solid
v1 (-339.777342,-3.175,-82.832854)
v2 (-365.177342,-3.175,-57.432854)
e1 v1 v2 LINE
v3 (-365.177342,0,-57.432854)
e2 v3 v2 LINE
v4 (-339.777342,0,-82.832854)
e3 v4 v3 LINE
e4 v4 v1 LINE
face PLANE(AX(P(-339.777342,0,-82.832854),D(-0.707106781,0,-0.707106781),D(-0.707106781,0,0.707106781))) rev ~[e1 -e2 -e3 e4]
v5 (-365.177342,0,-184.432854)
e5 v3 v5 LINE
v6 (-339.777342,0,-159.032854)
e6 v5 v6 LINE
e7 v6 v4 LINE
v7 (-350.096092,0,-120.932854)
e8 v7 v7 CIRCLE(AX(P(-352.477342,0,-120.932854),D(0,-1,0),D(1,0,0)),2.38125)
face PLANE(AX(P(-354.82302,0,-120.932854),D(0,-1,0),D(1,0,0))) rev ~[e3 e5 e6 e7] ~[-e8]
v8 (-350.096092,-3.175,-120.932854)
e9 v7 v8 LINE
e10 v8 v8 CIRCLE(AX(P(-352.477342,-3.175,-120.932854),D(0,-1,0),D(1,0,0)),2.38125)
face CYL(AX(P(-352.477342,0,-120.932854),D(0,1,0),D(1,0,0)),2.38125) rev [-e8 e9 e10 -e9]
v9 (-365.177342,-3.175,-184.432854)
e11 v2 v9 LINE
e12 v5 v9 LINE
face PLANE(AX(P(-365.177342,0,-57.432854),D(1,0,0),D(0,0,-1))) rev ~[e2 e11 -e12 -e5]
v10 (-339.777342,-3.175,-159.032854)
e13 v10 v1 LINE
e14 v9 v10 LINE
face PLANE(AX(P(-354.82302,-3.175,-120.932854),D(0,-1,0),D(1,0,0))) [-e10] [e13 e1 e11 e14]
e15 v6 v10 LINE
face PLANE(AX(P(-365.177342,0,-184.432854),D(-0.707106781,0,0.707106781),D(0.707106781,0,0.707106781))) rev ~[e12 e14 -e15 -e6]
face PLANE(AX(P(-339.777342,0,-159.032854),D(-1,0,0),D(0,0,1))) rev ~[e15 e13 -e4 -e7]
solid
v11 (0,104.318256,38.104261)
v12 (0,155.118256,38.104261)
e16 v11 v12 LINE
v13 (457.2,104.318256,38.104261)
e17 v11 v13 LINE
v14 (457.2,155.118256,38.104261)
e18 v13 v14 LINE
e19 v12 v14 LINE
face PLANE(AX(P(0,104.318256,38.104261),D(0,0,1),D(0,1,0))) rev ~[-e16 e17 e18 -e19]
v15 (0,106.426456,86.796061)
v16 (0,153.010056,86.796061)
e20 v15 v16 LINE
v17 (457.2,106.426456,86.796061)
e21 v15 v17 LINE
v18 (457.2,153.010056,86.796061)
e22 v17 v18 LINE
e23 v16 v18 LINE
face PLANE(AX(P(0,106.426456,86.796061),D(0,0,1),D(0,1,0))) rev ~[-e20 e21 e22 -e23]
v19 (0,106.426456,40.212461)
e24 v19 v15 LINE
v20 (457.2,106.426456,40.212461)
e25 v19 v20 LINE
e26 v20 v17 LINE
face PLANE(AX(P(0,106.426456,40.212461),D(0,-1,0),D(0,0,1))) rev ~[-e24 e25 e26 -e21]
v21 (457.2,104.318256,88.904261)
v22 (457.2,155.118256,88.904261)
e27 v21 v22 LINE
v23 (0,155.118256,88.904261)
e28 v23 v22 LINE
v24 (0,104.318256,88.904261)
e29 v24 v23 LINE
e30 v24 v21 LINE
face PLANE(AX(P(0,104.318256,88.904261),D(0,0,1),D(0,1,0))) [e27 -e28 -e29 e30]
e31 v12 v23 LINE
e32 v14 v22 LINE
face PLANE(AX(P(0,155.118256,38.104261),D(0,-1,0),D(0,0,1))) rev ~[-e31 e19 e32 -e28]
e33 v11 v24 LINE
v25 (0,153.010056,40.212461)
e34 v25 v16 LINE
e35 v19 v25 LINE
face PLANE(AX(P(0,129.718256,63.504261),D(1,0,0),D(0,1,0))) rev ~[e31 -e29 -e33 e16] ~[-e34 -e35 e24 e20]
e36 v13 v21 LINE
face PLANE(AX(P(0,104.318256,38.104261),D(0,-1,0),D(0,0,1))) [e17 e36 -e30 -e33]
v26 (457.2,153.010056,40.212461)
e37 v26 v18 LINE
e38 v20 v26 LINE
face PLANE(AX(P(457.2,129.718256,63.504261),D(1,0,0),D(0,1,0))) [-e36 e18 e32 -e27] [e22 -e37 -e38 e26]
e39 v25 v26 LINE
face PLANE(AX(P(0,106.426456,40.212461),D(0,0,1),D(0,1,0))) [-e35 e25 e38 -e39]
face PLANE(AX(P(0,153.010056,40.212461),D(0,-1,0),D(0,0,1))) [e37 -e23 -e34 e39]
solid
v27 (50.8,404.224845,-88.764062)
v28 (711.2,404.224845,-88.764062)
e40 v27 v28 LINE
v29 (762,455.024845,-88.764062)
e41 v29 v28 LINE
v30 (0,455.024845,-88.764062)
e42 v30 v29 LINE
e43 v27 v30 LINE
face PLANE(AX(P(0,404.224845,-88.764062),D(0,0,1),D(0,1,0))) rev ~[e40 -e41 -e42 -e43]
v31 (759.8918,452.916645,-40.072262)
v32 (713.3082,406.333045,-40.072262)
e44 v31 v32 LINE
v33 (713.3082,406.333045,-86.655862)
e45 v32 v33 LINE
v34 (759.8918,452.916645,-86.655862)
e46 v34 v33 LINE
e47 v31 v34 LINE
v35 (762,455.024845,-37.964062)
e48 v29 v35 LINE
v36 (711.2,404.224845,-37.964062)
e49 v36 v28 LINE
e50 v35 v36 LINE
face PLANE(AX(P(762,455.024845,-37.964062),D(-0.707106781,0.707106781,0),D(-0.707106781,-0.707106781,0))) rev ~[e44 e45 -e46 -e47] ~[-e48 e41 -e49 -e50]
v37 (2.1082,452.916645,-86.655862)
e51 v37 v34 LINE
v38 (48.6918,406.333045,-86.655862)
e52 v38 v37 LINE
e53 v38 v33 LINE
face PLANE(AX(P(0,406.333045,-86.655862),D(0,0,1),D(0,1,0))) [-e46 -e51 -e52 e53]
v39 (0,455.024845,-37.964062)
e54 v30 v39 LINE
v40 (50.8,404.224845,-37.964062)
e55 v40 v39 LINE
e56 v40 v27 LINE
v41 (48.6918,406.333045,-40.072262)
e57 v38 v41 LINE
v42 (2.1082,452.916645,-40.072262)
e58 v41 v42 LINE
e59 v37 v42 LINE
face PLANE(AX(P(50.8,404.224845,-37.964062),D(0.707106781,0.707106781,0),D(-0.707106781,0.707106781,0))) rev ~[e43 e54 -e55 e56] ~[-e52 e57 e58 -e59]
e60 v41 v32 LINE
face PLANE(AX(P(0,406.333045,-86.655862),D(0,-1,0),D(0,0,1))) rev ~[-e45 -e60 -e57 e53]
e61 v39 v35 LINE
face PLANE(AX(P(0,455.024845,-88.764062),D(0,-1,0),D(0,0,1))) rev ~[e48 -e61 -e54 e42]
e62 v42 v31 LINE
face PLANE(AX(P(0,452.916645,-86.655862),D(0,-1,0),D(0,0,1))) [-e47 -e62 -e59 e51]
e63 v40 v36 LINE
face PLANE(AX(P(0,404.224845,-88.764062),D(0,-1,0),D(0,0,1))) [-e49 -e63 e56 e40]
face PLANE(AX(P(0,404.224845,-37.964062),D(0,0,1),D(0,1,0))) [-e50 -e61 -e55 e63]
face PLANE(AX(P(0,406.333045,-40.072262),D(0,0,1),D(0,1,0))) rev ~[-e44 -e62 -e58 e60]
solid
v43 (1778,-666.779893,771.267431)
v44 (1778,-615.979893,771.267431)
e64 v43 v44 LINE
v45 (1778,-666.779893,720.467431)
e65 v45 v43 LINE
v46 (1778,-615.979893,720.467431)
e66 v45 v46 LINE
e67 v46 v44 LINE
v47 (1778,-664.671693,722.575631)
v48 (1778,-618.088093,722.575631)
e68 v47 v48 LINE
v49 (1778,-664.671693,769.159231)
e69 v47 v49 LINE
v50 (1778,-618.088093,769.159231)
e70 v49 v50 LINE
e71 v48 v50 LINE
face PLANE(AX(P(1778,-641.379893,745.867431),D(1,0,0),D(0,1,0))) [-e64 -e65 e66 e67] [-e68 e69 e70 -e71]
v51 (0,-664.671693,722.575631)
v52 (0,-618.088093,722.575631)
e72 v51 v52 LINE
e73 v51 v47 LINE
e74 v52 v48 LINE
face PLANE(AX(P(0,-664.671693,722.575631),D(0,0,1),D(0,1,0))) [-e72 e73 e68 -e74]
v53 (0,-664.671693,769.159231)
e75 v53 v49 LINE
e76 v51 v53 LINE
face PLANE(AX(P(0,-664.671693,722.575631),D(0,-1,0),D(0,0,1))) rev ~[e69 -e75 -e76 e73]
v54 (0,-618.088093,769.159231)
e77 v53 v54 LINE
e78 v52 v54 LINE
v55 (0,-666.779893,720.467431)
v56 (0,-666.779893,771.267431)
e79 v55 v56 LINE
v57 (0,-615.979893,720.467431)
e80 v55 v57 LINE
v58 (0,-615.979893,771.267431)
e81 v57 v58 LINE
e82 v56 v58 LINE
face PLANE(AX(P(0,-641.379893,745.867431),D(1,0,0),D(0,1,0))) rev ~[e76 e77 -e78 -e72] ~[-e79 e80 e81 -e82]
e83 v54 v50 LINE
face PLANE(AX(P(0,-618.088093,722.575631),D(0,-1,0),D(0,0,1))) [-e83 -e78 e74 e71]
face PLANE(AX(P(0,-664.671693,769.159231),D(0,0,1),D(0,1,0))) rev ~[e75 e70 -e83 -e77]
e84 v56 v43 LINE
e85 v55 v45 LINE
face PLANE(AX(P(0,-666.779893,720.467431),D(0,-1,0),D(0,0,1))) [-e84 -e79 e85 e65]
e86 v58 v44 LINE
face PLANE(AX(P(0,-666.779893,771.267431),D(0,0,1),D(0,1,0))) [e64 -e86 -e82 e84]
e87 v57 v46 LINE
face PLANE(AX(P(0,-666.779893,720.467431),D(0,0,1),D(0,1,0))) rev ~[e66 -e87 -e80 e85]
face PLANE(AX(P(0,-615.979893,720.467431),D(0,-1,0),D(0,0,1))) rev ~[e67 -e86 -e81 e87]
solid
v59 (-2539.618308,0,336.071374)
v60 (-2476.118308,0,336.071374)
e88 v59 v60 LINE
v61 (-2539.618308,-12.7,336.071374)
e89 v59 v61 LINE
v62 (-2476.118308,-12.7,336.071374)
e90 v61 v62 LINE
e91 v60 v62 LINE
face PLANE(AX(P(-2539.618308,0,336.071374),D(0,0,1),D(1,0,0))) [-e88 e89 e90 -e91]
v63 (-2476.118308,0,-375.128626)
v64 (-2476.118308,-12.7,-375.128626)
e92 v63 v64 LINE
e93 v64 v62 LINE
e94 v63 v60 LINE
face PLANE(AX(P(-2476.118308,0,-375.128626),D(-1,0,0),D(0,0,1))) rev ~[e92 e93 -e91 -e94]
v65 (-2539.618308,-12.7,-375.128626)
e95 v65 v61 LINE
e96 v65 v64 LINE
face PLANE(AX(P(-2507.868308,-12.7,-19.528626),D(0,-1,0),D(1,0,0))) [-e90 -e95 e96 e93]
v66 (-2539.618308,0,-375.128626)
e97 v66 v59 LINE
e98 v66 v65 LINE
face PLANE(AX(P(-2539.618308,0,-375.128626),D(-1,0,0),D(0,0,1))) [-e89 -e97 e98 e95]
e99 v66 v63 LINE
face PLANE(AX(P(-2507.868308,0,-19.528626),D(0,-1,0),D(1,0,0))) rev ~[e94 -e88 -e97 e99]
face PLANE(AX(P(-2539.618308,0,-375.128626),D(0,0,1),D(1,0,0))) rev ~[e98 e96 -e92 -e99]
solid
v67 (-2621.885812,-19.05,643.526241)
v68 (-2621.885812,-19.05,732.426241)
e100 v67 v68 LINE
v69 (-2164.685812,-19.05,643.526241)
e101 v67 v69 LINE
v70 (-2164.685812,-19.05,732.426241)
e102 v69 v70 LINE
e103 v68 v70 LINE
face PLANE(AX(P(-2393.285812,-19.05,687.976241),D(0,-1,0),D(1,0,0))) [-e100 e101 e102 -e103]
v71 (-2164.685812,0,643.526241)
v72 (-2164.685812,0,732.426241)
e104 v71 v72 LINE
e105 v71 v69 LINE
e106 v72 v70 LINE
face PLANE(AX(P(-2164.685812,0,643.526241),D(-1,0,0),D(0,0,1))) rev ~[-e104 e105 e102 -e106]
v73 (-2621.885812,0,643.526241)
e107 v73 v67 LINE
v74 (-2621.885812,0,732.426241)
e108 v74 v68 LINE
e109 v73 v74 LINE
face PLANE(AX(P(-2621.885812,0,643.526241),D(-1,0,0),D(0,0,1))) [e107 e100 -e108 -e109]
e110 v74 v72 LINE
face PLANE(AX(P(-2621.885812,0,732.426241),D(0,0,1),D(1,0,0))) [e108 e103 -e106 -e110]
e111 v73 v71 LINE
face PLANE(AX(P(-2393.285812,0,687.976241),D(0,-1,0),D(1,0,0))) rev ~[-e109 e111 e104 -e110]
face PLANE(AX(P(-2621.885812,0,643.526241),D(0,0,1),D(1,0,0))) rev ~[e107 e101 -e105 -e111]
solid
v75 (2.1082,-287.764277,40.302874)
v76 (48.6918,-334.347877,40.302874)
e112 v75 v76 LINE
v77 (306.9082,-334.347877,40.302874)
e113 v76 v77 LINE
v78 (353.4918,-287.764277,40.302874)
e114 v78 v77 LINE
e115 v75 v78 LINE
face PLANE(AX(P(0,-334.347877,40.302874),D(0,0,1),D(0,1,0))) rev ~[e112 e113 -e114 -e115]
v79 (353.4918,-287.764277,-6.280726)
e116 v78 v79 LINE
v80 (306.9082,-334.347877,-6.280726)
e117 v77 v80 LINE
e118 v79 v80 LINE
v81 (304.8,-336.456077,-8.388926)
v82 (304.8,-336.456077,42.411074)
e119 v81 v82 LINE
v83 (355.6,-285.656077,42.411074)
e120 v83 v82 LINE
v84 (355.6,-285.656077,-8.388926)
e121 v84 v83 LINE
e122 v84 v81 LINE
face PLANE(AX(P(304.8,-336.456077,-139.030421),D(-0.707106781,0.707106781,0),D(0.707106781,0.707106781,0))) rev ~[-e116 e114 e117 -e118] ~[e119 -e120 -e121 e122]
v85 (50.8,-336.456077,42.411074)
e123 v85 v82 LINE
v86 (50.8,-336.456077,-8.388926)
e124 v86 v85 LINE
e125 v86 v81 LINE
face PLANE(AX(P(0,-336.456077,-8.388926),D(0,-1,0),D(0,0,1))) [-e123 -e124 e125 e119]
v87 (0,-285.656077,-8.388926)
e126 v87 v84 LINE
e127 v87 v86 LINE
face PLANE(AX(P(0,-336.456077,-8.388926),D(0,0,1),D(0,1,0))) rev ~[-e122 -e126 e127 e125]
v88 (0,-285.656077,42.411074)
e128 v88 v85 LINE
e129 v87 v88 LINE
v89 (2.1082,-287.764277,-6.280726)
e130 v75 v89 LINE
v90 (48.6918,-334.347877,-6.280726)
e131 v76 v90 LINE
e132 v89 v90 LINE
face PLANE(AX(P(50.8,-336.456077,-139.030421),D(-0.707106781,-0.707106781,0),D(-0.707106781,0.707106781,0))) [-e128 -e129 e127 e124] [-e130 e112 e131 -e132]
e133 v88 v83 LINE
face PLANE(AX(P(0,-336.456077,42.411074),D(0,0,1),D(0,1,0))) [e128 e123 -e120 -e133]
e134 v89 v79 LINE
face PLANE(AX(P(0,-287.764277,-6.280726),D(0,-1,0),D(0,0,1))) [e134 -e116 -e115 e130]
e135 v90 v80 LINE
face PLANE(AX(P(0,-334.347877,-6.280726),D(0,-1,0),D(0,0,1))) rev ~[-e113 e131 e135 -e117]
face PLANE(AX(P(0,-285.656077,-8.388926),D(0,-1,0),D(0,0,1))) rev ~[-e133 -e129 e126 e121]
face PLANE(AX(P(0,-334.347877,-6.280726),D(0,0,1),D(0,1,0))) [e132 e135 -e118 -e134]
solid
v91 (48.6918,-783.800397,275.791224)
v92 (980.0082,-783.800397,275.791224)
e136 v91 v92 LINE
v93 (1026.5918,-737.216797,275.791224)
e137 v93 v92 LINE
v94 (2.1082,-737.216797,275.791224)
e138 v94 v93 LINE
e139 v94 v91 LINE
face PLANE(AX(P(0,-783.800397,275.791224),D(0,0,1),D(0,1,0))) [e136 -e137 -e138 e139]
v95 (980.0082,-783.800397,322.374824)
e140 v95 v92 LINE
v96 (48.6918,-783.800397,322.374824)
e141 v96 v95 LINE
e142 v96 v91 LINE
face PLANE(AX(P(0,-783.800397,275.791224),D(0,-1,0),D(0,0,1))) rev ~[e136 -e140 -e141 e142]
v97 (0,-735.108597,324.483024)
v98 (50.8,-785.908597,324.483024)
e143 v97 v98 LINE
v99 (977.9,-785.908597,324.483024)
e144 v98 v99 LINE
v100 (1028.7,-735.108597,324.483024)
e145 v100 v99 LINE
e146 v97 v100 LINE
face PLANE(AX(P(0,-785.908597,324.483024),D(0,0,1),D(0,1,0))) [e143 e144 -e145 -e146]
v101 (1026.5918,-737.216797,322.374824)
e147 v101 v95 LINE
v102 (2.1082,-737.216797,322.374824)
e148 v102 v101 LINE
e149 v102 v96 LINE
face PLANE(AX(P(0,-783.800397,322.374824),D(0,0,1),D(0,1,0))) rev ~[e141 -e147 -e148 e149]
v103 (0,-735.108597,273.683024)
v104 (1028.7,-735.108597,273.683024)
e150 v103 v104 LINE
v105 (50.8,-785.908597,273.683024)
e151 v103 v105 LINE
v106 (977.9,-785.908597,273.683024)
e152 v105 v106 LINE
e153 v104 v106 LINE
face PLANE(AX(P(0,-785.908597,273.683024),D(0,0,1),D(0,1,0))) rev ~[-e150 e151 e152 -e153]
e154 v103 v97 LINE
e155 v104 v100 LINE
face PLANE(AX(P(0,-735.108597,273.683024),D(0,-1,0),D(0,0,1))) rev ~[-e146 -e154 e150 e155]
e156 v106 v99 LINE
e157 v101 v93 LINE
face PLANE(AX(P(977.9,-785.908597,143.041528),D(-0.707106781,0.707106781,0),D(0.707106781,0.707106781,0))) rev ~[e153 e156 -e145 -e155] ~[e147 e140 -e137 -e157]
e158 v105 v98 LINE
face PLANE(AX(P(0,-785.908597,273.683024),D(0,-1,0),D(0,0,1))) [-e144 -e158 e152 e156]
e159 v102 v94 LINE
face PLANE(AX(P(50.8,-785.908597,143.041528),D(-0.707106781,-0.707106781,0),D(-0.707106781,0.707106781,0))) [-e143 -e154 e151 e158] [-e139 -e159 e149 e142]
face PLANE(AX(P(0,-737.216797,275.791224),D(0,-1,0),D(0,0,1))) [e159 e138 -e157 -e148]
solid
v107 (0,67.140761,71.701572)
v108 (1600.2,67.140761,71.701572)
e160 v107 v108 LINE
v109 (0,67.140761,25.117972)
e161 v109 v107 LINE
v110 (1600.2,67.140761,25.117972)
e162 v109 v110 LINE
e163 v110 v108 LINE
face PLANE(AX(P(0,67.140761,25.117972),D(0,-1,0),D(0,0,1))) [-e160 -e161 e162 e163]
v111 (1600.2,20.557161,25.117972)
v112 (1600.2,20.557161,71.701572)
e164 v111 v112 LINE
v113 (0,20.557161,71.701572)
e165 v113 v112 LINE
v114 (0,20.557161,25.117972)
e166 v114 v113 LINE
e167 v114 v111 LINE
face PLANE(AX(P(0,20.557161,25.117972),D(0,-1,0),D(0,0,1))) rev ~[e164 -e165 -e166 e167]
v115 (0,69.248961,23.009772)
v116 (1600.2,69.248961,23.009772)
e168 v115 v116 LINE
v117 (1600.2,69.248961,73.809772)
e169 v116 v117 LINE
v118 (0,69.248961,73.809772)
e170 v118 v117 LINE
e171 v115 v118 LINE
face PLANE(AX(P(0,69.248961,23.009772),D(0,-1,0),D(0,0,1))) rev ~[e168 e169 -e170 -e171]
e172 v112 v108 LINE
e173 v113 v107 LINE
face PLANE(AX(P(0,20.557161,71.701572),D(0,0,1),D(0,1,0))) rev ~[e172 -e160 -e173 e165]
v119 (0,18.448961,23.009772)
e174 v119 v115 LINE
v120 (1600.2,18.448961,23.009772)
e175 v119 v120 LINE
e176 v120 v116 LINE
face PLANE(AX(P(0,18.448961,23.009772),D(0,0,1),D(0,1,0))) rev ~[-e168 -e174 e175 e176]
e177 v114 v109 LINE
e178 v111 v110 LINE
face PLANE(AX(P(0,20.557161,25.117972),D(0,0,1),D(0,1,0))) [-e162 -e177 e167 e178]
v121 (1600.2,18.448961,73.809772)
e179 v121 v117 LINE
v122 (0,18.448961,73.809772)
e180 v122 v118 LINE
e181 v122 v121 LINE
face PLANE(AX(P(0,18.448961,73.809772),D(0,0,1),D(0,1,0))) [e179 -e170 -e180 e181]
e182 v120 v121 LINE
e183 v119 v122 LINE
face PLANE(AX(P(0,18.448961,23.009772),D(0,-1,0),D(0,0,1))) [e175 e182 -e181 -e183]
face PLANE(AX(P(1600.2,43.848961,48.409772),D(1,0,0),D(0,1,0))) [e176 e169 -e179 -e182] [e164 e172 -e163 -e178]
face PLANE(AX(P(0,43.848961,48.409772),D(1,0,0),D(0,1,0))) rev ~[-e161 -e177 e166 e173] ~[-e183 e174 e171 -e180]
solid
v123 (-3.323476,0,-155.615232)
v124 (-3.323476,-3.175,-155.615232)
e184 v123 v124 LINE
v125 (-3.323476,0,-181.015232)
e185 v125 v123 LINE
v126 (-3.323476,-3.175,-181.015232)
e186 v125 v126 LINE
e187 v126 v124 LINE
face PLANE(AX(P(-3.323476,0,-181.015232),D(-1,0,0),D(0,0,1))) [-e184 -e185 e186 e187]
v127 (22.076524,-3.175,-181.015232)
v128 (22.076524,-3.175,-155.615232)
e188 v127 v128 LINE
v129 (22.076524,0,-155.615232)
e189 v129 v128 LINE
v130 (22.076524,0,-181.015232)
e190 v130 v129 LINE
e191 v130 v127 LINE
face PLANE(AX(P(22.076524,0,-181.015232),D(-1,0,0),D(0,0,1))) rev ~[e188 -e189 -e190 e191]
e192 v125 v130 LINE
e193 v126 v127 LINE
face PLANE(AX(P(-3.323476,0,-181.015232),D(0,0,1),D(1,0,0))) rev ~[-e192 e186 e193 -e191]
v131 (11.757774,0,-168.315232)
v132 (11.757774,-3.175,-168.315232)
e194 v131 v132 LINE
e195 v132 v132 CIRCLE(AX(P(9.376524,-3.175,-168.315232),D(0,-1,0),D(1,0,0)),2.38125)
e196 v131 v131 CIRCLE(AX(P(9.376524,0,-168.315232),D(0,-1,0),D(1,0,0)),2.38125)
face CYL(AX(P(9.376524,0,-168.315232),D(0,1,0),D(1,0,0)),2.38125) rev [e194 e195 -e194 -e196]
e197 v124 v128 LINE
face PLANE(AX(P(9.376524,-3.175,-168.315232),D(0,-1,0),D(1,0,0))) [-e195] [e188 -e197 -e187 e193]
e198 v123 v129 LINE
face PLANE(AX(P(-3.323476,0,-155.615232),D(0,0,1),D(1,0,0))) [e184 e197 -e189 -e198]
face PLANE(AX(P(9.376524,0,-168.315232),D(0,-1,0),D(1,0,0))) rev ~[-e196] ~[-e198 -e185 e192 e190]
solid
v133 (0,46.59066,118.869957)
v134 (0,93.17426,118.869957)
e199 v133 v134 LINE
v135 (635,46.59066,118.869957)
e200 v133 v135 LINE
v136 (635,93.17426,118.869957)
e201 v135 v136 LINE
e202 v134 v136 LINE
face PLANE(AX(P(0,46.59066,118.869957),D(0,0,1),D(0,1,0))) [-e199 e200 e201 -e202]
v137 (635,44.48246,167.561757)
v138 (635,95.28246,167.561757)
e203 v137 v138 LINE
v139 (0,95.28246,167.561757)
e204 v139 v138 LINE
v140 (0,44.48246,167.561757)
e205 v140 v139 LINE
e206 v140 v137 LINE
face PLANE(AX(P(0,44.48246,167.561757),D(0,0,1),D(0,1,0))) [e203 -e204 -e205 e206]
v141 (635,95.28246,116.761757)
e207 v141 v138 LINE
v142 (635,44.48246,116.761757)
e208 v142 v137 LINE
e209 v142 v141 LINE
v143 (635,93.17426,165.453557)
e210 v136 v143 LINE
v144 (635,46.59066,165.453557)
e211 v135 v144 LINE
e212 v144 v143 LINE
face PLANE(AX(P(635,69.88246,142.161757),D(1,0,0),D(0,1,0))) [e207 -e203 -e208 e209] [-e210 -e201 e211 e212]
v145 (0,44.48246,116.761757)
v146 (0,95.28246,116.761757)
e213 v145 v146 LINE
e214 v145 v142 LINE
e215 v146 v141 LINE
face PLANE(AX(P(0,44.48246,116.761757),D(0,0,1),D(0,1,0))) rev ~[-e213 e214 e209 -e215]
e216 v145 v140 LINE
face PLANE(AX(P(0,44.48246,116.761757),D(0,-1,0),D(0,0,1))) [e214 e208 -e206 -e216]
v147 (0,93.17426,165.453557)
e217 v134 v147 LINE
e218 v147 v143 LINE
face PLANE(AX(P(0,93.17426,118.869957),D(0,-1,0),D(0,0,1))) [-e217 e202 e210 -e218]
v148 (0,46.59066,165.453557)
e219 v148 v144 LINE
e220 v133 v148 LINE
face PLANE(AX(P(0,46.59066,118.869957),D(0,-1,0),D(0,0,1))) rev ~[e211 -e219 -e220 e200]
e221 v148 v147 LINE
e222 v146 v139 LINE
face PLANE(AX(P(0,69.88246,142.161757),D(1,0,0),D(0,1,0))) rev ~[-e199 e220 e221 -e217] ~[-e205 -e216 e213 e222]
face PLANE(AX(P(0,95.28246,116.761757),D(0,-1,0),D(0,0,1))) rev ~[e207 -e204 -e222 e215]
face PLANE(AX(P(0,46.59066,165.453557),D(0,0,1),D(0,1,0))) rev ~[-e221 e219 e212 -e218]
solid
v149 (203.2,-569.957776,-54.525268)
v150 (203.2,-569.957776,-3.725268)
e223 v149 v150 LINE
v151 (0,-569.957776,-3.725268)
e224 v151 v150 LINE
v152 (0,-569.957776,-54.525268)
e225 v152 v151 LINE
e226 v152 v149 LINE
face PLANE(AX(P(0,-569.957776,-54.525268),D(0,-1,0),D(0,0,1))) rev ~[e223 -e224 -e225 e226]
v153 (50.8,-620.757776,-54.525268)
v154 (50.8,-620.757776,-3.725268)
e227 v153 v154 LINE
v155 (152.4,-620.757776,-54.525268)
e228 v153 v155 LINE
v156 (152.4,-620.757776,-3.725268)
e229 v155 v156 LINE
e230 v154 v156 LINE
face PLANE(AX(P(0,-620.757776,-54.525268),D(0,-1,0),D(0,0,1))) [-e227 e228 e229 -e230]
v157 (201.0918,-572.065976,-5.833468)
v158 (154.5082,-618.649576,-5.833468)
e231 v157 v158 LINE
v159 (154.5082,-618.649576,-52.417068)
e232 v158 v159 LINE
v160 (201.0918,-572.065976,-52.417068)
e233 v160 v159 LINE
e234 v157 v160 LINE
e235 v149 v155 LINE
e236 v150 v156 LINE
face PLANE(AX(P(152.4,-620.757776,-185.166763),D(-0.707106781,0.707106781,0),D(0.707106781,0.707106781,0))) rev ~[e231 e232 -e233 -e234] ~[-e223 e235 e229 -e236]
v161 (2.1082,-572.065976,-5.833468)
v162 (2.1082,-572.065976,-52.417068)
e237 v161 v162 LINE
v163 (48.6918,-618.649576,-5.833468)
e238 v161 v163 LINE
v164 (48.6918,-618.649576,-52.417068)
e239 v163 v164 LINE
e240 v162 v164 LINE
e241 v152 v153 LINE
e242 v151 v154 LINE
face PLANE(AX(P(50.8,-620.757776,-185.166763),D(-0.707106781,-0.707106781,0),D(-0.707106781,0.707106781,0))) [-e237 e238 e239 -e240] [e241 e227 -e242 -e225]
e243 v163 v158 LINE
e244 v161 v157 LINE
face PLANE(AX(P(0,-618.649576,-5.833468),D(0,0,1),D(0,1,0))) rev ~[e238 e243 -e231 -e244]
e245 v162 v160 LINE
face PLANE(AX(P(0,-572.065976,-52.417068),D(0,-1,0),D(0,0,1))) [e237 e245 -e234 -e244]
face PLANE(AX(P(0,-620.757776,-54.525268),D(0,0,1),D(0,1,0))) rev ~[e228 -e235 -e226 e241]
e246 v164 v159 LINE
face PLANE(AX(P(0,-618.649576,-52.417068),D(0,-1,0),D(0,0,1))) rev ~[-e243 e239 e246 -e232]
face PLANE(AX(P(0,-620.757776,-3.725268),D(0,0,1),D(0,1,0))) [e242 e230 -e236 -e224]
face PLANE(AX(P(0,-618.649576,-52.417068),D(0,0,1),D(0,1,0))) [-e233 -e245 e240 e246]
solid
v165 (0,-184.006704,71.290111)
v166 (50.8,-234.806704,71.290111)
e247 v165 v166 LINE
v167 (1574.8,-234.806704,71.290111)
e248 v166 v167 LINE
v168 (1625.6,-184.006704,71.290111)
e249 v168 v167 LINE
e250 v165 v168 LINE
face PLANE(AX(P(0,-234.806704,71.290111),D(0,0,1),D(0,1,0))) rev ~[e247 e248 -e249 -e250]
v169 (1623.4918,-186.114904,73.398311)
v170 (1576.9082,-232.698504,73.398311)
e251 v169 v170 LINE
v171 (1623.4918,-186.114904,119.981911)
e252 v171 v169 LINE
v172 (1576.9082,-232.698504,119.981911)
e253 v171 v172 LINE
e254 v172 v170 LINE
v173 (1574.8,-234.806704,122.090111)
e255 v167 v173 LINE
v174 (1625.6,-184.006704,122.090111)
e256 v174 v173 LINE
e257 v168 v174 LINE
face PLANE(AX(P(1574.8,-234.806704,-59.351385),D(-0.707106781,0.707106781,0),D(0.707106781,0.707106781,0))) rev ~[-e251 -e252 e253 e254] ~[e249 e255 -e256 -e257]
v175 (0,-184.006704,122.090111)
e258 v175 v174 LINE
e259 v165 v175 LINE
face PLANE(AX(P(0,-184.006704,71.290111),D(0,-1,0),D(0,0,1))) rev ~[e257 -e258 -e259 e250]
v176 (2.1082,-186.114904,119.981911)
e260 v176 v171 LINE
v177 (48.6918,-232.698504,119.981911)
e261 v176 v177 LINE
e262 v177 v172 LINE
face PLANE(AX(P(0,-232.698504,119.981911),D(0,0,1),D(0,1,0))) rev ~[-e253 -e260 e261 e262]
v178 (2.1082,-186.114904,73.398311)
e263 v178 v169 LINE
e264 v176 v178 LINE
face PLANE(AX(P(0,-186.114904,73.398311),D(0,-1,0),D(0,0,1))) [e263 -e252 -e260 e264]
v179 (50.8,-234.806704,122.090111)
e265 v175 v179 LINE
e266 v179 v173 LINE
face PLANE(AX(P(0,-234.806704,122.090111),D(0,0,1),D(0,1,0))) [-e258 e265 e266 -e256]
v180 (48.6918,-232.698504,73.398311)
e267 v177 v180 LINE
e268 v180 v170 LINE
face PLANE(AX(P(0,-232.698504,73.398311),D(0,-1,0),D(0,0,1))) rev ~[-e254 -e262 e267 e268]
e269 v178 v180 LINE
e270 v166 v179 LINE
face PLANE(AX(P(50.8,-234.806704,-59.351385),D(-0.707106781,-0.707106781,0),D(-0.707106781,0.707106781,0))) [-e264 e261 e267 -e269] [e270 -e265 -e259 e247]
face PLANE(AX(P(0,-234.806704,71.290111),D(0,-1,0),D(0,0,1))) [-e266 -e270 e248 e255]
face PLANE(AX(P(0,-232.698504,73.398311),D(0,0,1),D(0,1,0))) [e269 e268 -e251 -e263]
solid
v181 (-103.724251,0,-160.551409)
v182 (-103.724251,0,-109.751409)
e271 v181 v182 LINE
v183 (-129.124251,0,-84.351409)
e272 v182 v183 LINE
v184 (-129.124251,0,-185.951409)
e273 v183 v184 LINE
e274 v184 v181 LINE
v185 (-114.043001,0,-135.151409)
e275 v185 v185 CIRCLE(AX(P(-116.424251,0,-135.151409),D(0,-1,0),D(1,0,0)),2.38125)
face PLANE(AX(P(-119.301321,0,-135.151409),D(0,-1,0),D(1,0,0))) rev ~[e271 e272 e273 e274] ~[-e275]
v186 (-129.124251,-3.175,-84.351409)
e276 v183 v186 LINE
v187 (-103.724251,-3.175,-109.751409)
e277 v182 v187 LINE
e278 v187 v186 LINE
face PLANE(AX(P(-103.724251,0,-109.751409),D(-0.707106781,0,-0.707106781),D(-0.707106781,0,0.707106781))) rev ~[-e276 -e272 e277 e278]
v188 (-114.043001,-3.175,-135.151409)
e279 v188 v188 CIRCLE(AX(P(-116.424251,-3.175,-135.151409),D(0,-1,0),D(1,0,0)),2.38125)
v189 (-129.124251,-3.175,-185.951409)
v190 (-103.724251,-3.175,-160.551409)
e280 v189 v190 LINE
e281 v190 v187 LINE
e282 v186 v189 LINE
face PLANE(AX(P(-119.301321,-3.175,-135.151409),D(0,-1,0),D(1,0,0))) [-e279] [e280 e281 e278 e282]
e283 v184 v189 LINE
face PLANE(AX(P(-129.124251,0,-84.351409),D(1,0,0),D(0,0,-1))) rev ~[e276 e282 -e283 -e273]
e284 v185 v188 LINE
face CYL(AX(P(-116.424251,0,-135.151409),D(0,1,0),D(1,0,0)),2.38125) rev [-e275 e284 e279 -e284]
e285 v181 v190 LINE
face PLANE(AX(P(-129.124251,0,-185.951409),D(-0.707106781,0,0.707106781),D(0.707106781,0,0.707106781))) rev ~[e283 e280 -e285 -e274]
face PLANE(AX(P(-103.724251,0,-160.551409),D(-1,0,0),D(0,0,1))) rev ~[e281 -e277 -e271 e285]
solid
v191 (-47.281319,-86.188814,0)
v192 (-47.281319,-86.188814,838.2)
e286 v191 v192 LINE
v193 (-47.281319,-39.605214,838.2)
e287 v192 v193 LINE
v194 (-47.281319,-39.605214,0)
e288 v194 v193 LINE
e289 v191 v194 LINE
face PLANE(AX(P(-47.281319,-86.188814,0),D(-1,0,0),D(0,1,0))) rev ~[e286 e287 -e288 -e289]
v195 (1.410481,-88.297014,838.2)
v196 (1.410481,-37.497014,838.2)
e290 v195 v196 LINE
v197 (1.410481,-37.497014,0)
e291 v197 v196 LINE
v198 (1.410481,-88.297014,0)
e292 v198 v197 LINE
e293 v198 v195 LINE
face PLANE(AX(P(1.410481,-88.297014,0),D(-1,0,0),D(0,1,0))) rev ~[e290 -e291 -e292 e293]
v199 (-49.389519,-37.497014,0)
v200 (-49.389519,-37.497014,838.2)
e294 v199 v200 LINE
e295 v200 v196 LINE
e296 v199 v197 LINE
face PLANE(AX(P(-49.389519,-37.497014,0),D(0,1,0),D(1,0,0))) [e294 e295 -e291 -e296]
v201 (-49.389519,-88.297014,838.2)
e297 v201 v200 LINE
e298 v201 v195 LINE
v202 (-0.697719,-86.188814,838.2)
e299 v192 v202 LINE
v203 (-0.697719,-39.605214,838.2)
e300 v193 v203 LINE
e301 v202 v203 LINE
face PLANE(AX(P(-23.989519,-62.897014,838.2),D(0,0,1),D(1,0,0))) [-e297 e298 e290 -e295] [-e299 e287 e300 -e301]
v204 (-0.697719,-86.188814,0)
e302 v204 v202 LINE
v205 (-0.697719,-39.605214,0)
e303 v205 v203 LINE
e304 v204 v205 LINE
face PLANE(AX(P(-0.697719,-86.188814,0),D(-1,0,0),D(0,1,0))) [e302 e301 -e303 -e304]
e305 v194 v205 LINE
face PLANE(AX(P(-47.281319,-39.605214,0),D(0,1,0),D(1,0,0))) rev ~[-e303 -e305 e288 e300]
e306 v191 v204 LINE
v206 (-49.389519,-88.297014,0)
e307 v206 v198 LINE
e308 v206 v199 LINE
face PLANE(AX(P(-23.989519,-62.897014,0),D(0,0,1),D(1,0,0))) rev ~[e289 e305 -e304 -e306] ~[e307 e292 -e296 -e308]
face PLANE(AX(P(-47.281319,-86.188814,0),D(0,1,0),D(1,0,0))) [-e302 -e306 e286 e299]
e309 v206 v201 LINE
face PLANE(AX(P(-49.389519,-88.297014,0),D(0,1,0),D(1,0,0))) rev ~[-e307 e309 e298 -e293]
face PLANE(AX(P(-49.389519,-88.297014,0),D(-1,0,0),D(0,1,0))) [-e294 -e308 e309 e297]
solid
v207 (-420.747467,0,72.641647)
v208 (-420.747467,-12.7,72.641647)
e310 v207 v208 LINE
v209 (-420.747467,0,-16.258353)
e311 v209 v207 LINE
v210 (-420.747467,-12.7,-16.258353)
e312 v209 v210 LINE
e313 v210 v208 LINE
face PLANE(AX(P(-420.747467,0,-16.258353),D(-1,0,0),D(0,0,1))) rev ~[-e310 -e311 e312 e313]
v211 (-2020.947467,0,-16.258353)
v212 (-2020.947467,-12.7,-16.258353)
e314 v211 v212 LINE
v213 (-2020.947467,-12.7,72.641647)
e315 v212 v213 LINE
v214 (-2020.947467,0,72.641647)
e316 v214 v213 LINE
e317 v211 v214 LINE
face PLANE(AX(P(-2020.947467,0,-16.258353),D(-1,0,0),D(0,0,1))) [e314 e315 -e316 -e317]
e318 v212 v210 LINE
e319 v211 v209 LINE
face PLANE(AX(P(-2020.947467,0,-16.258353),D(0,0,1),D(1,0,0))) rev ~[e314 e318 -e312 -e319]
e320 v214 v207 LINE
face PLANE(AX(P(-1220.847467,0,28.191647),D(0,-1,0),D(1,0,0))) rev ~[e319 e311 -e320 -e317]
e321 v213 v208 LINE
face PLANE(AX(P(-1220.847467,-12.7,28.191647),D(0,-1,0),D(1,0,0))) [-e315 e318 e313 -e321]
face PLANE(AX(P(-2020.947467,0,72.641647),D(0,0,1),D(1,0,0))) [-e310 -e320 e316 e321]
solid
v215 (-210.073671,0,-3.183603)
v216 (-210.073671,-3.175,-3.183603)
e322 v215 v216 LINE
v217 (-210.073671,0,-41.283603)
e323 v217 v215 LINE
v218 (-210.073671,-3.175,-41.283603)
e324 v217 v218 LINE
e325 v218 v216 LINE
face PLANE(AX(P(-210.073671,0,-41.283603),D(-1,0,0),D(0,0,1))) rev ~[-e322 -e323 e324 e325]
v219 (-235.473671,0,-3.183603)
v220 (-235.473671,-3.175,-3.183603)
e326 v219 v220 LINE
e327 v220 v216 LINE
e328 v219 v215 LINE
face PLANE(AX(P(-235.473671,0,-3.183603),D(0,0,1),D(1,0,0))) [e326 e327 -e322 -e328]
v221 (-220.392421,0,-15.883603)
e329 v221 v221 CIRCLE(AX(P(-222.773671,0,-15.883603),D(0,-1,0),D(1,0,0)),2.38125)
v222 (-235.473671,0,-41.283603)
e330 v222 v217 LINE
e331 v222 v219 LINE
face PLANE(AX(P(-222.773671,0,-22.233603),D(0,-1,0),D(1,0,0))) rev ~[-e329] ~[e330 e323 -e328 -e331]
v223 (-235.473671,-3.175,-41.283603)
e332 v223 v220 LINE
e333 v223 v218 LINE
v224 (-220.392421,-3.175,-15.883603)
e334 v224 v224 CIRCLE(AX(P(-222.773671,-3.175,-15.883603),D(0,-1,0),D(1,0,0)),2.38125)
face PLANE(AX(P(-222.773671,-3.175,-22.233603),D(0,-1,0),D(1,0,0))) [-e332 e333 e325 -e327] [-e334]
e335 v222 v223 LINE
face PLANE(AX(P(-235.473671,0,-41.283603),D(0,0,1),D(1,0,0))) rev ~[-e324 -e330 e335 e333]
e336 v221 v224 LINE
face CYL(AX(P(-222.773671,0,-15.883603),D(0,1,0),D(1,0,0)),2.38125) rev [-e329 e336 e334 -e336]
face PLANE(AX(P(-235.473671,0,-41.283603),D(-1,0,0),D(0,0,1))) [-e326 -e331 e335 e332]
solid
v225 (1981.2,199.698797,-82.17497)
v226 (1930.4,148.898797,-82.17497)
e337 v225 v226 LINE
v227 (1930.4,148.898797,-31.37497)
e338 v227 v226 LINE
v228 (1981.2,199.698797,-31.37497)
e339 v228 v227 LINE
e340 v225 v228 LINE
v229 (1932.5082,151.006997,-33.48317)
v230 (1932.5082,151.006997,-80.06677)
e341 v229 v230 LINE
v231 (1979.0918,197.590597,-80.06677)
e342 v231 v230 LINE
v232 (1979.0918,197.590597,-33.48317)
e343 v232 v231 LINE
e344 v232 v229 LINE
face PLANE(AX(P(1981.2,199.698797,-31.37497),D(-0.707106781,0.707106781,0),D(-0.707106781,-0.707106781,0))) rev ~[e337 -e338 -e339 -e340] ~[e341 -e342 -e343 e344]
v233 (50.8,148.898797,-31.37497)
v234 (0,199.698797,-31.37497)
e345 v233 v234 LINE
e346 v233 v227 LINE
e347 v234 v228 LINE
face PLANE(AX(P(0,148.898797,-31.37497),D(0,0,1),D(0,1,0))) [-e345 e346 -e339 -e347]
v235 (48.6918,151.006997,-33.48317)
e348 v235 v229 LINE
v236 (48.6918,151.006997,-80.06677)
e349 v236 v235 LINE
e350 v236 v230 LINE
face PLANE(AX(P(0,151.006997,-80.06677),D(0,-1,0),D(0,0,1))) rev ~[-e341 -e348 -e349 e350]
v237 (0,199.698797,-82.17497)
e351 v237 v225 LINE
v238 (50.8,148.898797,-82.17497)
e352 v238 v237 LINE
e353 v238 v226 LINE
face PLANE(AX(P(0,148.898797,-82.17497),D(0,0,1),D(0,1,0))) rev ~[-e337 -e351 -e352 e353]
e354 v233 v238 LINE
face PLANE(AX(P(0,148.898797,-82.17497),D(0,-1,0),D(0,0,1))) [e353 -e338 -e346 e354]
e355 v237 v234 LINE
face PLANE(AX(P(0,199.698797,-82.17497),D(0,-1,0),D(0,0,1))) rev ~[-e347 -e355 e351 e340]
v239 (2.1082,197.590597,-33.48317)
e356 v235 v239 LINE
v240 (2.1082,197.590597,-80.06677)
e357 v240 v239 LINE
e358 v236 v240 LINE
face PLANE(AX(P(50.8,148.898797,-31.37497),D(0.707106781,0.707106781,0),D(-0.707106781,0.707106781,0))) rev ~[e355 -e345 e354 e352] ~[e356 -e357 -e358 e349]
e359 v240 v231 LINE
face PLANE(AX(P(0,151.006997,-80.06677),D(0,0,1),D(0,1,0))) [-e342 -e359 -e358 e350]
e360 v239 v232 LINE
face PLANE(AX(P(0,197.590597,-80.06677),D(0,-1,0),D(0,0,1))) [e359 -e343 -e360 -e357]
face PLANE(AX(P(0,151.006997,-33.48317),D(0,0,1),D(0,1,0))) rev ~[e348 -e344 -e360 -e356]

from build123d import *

# Parameters (mm, degrees)
F0_W         = 50.8
F0_H         = 50.8
F0_W_2       = 46.5836
F0_H_2       = 46.5836
F1_DEPTH     = 838.2
F2_W         = 50.8
F2_H         = 50.8
F2_W_2       = 46.5836
F2_H_2       = 46.5836
F3_DEPTH     = 1600.2
F4_W         = 50.8
F4_H         = 50.8
F4_W_2       = 46.5836
F4_H_2       = 46.5836
F5_DEPTH     = 457.2
F6_W         = 50.8
F6_H         = 50.8
F6_W_2       = 46.5836
F6_H_2       = 46.5836
F7_DEPTH     = 1981.2
F9_DEPTH     = 50.8
F10_W        = 50.8
F10_H        = 50.8
F10_W_2      = 46.5836
F10_H_2      = 46.5836
F11_DEPTH    = 762
F13_DEPTH    = 50.8
F14_R        = 2.38125
F15_DEPTH    = 3.175
F16_W        = 25.4
F16_H        = 25.4
F16_R        = 2.38125
F17_DEPTH    = 3.175
F18_W        = 1600.2
F18_H        = 88.9
F19_DEPTH    = 12.7
F20_W        = 63.5
F20_H        = 711.2
F21_DEPTH    = 12.7
F22_W        = 50.8
F22_H        = 50.8
F22_W_2      = 46.5836
F22_H_2      = 46.5836
F23_DEPTH    = 355.6
F24_T1_DEPTH = 312.0829915773
F25_W        = 50.8
F25_H        = 50.8
F25_W_2      = 46.5836
F25_H_2      = 46.5836
F26_DEPTH    = 1625.6
F27_T1_DEPTH = 312.0829915773
F28_W        = 50.8
F28_H        = 50.8
F28_W_2      = 46.5836
F28_H_2      = 46.5836
F29_DEPTH    = 203.2
F30_T1_DEPTH = 312.0829915773
F31_R        = 2.38125
F32_DEPTH    = 3.175
F33_W        = 25.4
F33_H        = 38.1
F33_R        = 2.38125
F34_DEPTH    = 3.175
F35_W        = 457.2
F35_H        = 88.9
F36_DEPTH    = 19.05
F37_W        = 50.8
F37_H        = 50.8
F37_W_2      = 46.5836
F37_H_2      = 46.5836
F38_DEPTH    = 1028.7
F39_T1_DEPTH = 312.0829915773
F40_W        = 50.8
F40_H        = 50.8
F40_W_2      = 46.5836
F40_H_2      = 46.5836
F41_DEPTH    = 635
F42_W        = 50.8
F42_H        = 50.8
F42_W_2      = 46.5836
F42_H_2      = 46.5836
F43_DEPTH    = 1778


# Not quite as in the source:
# - a fillet or chamfer that OpenCascade refuses, or shapes differently, is made with other operations: its cross-section is extruded or revolved along the edge and cut away or added


with BuildPart() as f1:
    # F0 (on Top) → F1 (new body)
    with BuildSketch(Plane.XY):
        with Locations((-23.9895193481, -62.8970144058)):
            Rectangle(F0_W, F0_H)
        with Locations((-23.9895193481, -62.8970144058)):
            Rectangle(F0_W_2, F0_H_2, mode=Mode.SUBTRACT)
    extrude(amount=F1_DEPTH)


with BuildPart() as f3:
    # F2 (on Right) → F3 (new body)
    with BuildSketch(Plane.YZ):
        with Locations((43.8489612991, 48.4097724301)):
            Rectangle(F2_W, F2_H)
        with Locations((43.8489612991, 48.4097724301)):
            Rectangle(F2_W_2, F2_H_2, mode=Mode.SUBTRACT)
    extrude(amount=F3_DEPTH)


with BuildPart() as f5:
    # F4 (on Right) → F5 (new body)
    with BuildSketch(Plane.YZ):
        with Locations((129.718255794, 63.5042605758)):
            Rectangle(F4_W, F4_H)
        with Locations((129.718255794, 63.5042605758)):
            Rectangle(F4_W_2, F4_H_2, mode=Mode.SUBTRACT)
    extrude(amount=F5_DEPTH)


with BuildPart() as f7:
    # F6 (on Right) → F7 (new body)
    with BuildSketch(Plane.YZ):
        with Locations((174.2987973452, -56.7749696016)):
            Rectangle(F6_W, F6_H)
        with Locations((174.2987973452, -56.7749696016)):
            Rectangle(F6_W_2, F6_H_2, mode=Mode.SUBTRACT)
    extrude(amount=F7_DEPTH)

    # F8 (on face) → F9 (cut, through all)
    with BuildSketch(Plane.XY.offset(-31.3749696016)):
        Polygon((1981.2, 148.8987973452), (1981.2, 199.6987973452), (1930.4, 148.8987973452), align=None)
        Polygon((50.8, 148.8987973452), (0, 199.6987973452), (0, 148.8987973452), align=None)
    extrude(amount=-F9_DEPTH, mode=Mode.SUBTRACT)


with BuildPart() as f11:
    # F10 (on Right) → F11 (new body)
    with BuildSketch(Plane.YZ):
        with Locations((429.6248448849, -63.3640619159)):
            Rectangle(F10_W, F10_H)
        with Locations((429.6248448849, -63.3640619159)):
            Rectangle(F10_W_2, F10_H_2, mode=Mode.SUBTRACT)
    extrude(amount=F11_DEPTH)

    # F12 (on face) → F13 (cut, through all)
    with BuildSketch(Plane.XY.offset(-37.9640619159)):
        Polygon((50.8, 404.2248448849), (0, 455.0248448849), (0, 404.2248448849), align=None)
        Polygon((762, 404.2248448849), (762, 455.0248448849), (711.2, 404.2248448849), align=None)
    extrude(amount=-F13_DEPTH, mode=Mode.SUBTRACT)


with BuildPart() as f15:
    # F14 (on Front) → F15 (new body)
    with BuildSketch(Plane.XZ):
        Polygon((-103.7242509466, -109.7514086127), (-129.1242509466, -84.3514086127), (-129.1242509466, -185.9514086127), (-103.7242509466, -160.5514086127), align=None)
        with Locations((-116.4242509466, -135.1514086127)):
            Circle(F14_R, mode=Mode.SUBTRACT)
    extrude(amount=F15_DEPTH)


with BuildPart() as f17:
    # F16 (on Front) → F17 (new body)
    with BuildSketch(Plane.XZ):
        with Locations((9.3765241186, -168.3152318001)):
            Rectangle(F16_W, F16_H)
        with Locations((9.3765241186, -168.3152318001)):
            Circle(F16_R, mode=Mode.SUBTRACT)
    extrude(amount=F17_DEPTH)


with BuildPart() as f19:
    # F18 (on Front) → F19 (new body)
    with BuildSketch(Plane.XZ):
        with Locations((-1220.8474673271, 28.1916467965)):
            Rectangle(F18_W, F18_H)
    extrude(amount=F19_DEPTH)


with BuildPart() as f21:
    # F20 (on Front) → F21 (new body)
    with BuildSketch(Plane.XZ):
        with Locations((-2507.8683080673, -19.528626181)):
            Rectangle(F20_W, F20_H)
    extrude(amount=F21_DEPTH)


with BuildPart() as f23:
    # F22 (on Right) → F23 (new body)
    with BuildSketch(Plane.YZ):
        with Locations((-311.0560774803, 17.0110743493)):
            Rectangle(F22_W, F22_H)
        with Locations((-311.0560774803, 17.0110743493)):
            Rectangle(F22_W_2, F22_H_2, mode=Mode.SUBTRACT)
    extrude(amount=F23_DEPTH)

    # F24: chamfer of 50.8 on 2 edges, made by hand

    # F24_s2 → F24_t1 (cut)
    with BuildSketch(Plane.XY.offset(-139.0304214394)):
        Polygon((304.8, -336.4560774803), (355.6, -285.6560774803), (355.6, -336.4560774803), align=None)
        Polygon((50.8, -336.4560774803), (0, -285.6560774803), (0, -336.4560774803), align=None)
    extrude(amount=F24_T1_DEPTH, mode=Mode.SUBTRACT)


with BuildPart() as f26:
    # F25 (on Right) → F26 (new body)
    with BuildSketch(Plane.YZ):
        with Locations((-209.4067037106, 96.6901108623)):
            Rectangle(F25_W, F25_H)
        with Locations((-209.4067037106, 96.6901108623)):
            Rectangle(F25_W_2, F25_H_2, mode=Mode.SUBTRACT)
    extrude(amount=F26_DEPTH)

    # F27: chamfer of 50.8 on 2 edges, made by hand

    # F27_s2 → F27_t1 (cut)
    with BuildSketch(Plane.XY.offset(-59.3513849264)):
        Polygon((50.8, -234.8067037106), (0, -184.0067037106), (0, -234.8067037106), align=None)
        Polygon((1574.8, -234.8067037106), (1625.6, -184.0067037106), (1625.6, -234.8067037106), align=None)
    extrude(amount=F27_T1_DEPTH, mode=Mode.SUBTRACT)


with BuildPart() as f29:
    # F28 (on Right) → F29 (new body)
    with BuildSketch(Plane.YZ):
        with Locations((-595.3577756882, -29.1252676398)):
            Rectangle(F28_W, F28_H)
        with Locations((-595.3577756882, -29.1252676398)):
            Rectangle(F28_W_2, F28_H_2, mode=Mode.SUBTRACT)
    extrude(amount=F29_DEPTH)

    # F30: chamfer of 50.8 on 2 edges, made by hand

    # F30_s2 → F30_t1 (cut)
    with BuildSketch(Plane.XY.offset(-185.1667634284)):
        Polygon((152.4, -620.7577756882), (203.2, -569.9577756882), (203.2, -620.7577756882), align=None)
        Polygon((50.8, -620.7577756882), (0, -569.9577756882), (0, -620.7577756882), align=None)
    extrude(amount=F30_T1_DEPTH, mode=Mode.SUBTRACT)


with BuildPart() as f32:
    # F31 (on Front) → F32 (new body)
    with BuildSketch(Plane.XZ):
        Polygon((-339.7773418903, -82.8328536272), (-365.1773418903, -57.4328536272), (-365.1773418903, -184.4328536272), (-339.7773418903, -159.0328536272), align=None)
        with Locations((-352.4773418903, -120.9328536272)):
            Circle(F31_R, mode=Mode.SUBTRACT)
    extrude(amount=F32_DEPTH)


with BuildPart() as f34:
    # F33 (on Front) → F34 (new body)
    with BuildSketch(Plane.XZ):
        with Locations((-222.7736711502, -22.2336029798)):
            Rectangle(F33_W, F33_H)
        with Locations((-222.7736711502, -15.8836029798)):
            Circle(F33_R, mode=Mode.SUBTRACT)
    extrude(amount=F34_DEPTH)


with BuildPart() as f36:
    # F35 (on Front) → F36 (new body)
    with BuildSketch(Plane.XZ):
        with Locations((-2393.2858118057, 687.9762411118)):
            Rectangle(F35_W, F35_H)
    extrude(amount=F36_DEPTH)


with BuildPart() as f38:
    # F37 (on Right) → F38 (new body)
    with BuildSketch(Plane.YZ):
        with Locations((-760.5085968971, 299.0830242634)):
            Rectangle(F37_W, F37_H)
        with Locations((-760.5085968971, 299.0830242634)):
            Rectangle(F37_W_2, F37_H_2, mode=Mode.SUBTRACT)
    extrude(amount=F38_DEPTH)

    # F39: chamfer of 50.8 on 2 edges, made by hand

    # F39_s2 → F39_t1 (cut)
    with BuildSketch(Plane.XY.offset(143.0415284747)):
        Polygon((977.9, -785.9085968971), (1028.7, -735.1085968971), (1028.7, -785.9085968971), align=None)
        Polygon((50.8, -785.9085968971), (0, -735.1085968971), (0, -785.9085968971), align=None)
    extrude(amount=F39_T1_DEPTH, mode=Mode.SUBTRACT)


with BuildPart() as f41:
    # F40 (on Right) → F41 (new body)
    with BuildSketch(Plane.YZ):
        with Locations((69.8824599385, 142.1617567539)):
            Rectangle(F40_W, F40_H)
        with Locations((69.8824599385, 142.1617567539)):
            Rectangle(F40_W_2, F40_H_2, mode=Mode.SUBTRACT)
    extrude(amount=F41_DEPTH)


with BuildPart() as f43:
    # F42 (on Right) → F43 (new body)
    with BuildSketch(Plane.YZ):
        with Locations((-641.3798928261, 745.8674311638)):
            Rectangle(F42_W, F42_H)
        with Locations((-641.3798928261, 745.8674311638)):
            Rectangle(F42_W_2, F42_H_2, mode=Mode.SUBTRACT)
    extrude(amount=F43_DEPTH)


solid = Compound([f1.part, f3.part, f5.part, f7.part, f11.part, f15.part, f17.part, f19.part, f21.part, f23.part, f26.part, f29.part, f32.part, f34.part, f36.part, f38.part, f41.part, f43.part])
